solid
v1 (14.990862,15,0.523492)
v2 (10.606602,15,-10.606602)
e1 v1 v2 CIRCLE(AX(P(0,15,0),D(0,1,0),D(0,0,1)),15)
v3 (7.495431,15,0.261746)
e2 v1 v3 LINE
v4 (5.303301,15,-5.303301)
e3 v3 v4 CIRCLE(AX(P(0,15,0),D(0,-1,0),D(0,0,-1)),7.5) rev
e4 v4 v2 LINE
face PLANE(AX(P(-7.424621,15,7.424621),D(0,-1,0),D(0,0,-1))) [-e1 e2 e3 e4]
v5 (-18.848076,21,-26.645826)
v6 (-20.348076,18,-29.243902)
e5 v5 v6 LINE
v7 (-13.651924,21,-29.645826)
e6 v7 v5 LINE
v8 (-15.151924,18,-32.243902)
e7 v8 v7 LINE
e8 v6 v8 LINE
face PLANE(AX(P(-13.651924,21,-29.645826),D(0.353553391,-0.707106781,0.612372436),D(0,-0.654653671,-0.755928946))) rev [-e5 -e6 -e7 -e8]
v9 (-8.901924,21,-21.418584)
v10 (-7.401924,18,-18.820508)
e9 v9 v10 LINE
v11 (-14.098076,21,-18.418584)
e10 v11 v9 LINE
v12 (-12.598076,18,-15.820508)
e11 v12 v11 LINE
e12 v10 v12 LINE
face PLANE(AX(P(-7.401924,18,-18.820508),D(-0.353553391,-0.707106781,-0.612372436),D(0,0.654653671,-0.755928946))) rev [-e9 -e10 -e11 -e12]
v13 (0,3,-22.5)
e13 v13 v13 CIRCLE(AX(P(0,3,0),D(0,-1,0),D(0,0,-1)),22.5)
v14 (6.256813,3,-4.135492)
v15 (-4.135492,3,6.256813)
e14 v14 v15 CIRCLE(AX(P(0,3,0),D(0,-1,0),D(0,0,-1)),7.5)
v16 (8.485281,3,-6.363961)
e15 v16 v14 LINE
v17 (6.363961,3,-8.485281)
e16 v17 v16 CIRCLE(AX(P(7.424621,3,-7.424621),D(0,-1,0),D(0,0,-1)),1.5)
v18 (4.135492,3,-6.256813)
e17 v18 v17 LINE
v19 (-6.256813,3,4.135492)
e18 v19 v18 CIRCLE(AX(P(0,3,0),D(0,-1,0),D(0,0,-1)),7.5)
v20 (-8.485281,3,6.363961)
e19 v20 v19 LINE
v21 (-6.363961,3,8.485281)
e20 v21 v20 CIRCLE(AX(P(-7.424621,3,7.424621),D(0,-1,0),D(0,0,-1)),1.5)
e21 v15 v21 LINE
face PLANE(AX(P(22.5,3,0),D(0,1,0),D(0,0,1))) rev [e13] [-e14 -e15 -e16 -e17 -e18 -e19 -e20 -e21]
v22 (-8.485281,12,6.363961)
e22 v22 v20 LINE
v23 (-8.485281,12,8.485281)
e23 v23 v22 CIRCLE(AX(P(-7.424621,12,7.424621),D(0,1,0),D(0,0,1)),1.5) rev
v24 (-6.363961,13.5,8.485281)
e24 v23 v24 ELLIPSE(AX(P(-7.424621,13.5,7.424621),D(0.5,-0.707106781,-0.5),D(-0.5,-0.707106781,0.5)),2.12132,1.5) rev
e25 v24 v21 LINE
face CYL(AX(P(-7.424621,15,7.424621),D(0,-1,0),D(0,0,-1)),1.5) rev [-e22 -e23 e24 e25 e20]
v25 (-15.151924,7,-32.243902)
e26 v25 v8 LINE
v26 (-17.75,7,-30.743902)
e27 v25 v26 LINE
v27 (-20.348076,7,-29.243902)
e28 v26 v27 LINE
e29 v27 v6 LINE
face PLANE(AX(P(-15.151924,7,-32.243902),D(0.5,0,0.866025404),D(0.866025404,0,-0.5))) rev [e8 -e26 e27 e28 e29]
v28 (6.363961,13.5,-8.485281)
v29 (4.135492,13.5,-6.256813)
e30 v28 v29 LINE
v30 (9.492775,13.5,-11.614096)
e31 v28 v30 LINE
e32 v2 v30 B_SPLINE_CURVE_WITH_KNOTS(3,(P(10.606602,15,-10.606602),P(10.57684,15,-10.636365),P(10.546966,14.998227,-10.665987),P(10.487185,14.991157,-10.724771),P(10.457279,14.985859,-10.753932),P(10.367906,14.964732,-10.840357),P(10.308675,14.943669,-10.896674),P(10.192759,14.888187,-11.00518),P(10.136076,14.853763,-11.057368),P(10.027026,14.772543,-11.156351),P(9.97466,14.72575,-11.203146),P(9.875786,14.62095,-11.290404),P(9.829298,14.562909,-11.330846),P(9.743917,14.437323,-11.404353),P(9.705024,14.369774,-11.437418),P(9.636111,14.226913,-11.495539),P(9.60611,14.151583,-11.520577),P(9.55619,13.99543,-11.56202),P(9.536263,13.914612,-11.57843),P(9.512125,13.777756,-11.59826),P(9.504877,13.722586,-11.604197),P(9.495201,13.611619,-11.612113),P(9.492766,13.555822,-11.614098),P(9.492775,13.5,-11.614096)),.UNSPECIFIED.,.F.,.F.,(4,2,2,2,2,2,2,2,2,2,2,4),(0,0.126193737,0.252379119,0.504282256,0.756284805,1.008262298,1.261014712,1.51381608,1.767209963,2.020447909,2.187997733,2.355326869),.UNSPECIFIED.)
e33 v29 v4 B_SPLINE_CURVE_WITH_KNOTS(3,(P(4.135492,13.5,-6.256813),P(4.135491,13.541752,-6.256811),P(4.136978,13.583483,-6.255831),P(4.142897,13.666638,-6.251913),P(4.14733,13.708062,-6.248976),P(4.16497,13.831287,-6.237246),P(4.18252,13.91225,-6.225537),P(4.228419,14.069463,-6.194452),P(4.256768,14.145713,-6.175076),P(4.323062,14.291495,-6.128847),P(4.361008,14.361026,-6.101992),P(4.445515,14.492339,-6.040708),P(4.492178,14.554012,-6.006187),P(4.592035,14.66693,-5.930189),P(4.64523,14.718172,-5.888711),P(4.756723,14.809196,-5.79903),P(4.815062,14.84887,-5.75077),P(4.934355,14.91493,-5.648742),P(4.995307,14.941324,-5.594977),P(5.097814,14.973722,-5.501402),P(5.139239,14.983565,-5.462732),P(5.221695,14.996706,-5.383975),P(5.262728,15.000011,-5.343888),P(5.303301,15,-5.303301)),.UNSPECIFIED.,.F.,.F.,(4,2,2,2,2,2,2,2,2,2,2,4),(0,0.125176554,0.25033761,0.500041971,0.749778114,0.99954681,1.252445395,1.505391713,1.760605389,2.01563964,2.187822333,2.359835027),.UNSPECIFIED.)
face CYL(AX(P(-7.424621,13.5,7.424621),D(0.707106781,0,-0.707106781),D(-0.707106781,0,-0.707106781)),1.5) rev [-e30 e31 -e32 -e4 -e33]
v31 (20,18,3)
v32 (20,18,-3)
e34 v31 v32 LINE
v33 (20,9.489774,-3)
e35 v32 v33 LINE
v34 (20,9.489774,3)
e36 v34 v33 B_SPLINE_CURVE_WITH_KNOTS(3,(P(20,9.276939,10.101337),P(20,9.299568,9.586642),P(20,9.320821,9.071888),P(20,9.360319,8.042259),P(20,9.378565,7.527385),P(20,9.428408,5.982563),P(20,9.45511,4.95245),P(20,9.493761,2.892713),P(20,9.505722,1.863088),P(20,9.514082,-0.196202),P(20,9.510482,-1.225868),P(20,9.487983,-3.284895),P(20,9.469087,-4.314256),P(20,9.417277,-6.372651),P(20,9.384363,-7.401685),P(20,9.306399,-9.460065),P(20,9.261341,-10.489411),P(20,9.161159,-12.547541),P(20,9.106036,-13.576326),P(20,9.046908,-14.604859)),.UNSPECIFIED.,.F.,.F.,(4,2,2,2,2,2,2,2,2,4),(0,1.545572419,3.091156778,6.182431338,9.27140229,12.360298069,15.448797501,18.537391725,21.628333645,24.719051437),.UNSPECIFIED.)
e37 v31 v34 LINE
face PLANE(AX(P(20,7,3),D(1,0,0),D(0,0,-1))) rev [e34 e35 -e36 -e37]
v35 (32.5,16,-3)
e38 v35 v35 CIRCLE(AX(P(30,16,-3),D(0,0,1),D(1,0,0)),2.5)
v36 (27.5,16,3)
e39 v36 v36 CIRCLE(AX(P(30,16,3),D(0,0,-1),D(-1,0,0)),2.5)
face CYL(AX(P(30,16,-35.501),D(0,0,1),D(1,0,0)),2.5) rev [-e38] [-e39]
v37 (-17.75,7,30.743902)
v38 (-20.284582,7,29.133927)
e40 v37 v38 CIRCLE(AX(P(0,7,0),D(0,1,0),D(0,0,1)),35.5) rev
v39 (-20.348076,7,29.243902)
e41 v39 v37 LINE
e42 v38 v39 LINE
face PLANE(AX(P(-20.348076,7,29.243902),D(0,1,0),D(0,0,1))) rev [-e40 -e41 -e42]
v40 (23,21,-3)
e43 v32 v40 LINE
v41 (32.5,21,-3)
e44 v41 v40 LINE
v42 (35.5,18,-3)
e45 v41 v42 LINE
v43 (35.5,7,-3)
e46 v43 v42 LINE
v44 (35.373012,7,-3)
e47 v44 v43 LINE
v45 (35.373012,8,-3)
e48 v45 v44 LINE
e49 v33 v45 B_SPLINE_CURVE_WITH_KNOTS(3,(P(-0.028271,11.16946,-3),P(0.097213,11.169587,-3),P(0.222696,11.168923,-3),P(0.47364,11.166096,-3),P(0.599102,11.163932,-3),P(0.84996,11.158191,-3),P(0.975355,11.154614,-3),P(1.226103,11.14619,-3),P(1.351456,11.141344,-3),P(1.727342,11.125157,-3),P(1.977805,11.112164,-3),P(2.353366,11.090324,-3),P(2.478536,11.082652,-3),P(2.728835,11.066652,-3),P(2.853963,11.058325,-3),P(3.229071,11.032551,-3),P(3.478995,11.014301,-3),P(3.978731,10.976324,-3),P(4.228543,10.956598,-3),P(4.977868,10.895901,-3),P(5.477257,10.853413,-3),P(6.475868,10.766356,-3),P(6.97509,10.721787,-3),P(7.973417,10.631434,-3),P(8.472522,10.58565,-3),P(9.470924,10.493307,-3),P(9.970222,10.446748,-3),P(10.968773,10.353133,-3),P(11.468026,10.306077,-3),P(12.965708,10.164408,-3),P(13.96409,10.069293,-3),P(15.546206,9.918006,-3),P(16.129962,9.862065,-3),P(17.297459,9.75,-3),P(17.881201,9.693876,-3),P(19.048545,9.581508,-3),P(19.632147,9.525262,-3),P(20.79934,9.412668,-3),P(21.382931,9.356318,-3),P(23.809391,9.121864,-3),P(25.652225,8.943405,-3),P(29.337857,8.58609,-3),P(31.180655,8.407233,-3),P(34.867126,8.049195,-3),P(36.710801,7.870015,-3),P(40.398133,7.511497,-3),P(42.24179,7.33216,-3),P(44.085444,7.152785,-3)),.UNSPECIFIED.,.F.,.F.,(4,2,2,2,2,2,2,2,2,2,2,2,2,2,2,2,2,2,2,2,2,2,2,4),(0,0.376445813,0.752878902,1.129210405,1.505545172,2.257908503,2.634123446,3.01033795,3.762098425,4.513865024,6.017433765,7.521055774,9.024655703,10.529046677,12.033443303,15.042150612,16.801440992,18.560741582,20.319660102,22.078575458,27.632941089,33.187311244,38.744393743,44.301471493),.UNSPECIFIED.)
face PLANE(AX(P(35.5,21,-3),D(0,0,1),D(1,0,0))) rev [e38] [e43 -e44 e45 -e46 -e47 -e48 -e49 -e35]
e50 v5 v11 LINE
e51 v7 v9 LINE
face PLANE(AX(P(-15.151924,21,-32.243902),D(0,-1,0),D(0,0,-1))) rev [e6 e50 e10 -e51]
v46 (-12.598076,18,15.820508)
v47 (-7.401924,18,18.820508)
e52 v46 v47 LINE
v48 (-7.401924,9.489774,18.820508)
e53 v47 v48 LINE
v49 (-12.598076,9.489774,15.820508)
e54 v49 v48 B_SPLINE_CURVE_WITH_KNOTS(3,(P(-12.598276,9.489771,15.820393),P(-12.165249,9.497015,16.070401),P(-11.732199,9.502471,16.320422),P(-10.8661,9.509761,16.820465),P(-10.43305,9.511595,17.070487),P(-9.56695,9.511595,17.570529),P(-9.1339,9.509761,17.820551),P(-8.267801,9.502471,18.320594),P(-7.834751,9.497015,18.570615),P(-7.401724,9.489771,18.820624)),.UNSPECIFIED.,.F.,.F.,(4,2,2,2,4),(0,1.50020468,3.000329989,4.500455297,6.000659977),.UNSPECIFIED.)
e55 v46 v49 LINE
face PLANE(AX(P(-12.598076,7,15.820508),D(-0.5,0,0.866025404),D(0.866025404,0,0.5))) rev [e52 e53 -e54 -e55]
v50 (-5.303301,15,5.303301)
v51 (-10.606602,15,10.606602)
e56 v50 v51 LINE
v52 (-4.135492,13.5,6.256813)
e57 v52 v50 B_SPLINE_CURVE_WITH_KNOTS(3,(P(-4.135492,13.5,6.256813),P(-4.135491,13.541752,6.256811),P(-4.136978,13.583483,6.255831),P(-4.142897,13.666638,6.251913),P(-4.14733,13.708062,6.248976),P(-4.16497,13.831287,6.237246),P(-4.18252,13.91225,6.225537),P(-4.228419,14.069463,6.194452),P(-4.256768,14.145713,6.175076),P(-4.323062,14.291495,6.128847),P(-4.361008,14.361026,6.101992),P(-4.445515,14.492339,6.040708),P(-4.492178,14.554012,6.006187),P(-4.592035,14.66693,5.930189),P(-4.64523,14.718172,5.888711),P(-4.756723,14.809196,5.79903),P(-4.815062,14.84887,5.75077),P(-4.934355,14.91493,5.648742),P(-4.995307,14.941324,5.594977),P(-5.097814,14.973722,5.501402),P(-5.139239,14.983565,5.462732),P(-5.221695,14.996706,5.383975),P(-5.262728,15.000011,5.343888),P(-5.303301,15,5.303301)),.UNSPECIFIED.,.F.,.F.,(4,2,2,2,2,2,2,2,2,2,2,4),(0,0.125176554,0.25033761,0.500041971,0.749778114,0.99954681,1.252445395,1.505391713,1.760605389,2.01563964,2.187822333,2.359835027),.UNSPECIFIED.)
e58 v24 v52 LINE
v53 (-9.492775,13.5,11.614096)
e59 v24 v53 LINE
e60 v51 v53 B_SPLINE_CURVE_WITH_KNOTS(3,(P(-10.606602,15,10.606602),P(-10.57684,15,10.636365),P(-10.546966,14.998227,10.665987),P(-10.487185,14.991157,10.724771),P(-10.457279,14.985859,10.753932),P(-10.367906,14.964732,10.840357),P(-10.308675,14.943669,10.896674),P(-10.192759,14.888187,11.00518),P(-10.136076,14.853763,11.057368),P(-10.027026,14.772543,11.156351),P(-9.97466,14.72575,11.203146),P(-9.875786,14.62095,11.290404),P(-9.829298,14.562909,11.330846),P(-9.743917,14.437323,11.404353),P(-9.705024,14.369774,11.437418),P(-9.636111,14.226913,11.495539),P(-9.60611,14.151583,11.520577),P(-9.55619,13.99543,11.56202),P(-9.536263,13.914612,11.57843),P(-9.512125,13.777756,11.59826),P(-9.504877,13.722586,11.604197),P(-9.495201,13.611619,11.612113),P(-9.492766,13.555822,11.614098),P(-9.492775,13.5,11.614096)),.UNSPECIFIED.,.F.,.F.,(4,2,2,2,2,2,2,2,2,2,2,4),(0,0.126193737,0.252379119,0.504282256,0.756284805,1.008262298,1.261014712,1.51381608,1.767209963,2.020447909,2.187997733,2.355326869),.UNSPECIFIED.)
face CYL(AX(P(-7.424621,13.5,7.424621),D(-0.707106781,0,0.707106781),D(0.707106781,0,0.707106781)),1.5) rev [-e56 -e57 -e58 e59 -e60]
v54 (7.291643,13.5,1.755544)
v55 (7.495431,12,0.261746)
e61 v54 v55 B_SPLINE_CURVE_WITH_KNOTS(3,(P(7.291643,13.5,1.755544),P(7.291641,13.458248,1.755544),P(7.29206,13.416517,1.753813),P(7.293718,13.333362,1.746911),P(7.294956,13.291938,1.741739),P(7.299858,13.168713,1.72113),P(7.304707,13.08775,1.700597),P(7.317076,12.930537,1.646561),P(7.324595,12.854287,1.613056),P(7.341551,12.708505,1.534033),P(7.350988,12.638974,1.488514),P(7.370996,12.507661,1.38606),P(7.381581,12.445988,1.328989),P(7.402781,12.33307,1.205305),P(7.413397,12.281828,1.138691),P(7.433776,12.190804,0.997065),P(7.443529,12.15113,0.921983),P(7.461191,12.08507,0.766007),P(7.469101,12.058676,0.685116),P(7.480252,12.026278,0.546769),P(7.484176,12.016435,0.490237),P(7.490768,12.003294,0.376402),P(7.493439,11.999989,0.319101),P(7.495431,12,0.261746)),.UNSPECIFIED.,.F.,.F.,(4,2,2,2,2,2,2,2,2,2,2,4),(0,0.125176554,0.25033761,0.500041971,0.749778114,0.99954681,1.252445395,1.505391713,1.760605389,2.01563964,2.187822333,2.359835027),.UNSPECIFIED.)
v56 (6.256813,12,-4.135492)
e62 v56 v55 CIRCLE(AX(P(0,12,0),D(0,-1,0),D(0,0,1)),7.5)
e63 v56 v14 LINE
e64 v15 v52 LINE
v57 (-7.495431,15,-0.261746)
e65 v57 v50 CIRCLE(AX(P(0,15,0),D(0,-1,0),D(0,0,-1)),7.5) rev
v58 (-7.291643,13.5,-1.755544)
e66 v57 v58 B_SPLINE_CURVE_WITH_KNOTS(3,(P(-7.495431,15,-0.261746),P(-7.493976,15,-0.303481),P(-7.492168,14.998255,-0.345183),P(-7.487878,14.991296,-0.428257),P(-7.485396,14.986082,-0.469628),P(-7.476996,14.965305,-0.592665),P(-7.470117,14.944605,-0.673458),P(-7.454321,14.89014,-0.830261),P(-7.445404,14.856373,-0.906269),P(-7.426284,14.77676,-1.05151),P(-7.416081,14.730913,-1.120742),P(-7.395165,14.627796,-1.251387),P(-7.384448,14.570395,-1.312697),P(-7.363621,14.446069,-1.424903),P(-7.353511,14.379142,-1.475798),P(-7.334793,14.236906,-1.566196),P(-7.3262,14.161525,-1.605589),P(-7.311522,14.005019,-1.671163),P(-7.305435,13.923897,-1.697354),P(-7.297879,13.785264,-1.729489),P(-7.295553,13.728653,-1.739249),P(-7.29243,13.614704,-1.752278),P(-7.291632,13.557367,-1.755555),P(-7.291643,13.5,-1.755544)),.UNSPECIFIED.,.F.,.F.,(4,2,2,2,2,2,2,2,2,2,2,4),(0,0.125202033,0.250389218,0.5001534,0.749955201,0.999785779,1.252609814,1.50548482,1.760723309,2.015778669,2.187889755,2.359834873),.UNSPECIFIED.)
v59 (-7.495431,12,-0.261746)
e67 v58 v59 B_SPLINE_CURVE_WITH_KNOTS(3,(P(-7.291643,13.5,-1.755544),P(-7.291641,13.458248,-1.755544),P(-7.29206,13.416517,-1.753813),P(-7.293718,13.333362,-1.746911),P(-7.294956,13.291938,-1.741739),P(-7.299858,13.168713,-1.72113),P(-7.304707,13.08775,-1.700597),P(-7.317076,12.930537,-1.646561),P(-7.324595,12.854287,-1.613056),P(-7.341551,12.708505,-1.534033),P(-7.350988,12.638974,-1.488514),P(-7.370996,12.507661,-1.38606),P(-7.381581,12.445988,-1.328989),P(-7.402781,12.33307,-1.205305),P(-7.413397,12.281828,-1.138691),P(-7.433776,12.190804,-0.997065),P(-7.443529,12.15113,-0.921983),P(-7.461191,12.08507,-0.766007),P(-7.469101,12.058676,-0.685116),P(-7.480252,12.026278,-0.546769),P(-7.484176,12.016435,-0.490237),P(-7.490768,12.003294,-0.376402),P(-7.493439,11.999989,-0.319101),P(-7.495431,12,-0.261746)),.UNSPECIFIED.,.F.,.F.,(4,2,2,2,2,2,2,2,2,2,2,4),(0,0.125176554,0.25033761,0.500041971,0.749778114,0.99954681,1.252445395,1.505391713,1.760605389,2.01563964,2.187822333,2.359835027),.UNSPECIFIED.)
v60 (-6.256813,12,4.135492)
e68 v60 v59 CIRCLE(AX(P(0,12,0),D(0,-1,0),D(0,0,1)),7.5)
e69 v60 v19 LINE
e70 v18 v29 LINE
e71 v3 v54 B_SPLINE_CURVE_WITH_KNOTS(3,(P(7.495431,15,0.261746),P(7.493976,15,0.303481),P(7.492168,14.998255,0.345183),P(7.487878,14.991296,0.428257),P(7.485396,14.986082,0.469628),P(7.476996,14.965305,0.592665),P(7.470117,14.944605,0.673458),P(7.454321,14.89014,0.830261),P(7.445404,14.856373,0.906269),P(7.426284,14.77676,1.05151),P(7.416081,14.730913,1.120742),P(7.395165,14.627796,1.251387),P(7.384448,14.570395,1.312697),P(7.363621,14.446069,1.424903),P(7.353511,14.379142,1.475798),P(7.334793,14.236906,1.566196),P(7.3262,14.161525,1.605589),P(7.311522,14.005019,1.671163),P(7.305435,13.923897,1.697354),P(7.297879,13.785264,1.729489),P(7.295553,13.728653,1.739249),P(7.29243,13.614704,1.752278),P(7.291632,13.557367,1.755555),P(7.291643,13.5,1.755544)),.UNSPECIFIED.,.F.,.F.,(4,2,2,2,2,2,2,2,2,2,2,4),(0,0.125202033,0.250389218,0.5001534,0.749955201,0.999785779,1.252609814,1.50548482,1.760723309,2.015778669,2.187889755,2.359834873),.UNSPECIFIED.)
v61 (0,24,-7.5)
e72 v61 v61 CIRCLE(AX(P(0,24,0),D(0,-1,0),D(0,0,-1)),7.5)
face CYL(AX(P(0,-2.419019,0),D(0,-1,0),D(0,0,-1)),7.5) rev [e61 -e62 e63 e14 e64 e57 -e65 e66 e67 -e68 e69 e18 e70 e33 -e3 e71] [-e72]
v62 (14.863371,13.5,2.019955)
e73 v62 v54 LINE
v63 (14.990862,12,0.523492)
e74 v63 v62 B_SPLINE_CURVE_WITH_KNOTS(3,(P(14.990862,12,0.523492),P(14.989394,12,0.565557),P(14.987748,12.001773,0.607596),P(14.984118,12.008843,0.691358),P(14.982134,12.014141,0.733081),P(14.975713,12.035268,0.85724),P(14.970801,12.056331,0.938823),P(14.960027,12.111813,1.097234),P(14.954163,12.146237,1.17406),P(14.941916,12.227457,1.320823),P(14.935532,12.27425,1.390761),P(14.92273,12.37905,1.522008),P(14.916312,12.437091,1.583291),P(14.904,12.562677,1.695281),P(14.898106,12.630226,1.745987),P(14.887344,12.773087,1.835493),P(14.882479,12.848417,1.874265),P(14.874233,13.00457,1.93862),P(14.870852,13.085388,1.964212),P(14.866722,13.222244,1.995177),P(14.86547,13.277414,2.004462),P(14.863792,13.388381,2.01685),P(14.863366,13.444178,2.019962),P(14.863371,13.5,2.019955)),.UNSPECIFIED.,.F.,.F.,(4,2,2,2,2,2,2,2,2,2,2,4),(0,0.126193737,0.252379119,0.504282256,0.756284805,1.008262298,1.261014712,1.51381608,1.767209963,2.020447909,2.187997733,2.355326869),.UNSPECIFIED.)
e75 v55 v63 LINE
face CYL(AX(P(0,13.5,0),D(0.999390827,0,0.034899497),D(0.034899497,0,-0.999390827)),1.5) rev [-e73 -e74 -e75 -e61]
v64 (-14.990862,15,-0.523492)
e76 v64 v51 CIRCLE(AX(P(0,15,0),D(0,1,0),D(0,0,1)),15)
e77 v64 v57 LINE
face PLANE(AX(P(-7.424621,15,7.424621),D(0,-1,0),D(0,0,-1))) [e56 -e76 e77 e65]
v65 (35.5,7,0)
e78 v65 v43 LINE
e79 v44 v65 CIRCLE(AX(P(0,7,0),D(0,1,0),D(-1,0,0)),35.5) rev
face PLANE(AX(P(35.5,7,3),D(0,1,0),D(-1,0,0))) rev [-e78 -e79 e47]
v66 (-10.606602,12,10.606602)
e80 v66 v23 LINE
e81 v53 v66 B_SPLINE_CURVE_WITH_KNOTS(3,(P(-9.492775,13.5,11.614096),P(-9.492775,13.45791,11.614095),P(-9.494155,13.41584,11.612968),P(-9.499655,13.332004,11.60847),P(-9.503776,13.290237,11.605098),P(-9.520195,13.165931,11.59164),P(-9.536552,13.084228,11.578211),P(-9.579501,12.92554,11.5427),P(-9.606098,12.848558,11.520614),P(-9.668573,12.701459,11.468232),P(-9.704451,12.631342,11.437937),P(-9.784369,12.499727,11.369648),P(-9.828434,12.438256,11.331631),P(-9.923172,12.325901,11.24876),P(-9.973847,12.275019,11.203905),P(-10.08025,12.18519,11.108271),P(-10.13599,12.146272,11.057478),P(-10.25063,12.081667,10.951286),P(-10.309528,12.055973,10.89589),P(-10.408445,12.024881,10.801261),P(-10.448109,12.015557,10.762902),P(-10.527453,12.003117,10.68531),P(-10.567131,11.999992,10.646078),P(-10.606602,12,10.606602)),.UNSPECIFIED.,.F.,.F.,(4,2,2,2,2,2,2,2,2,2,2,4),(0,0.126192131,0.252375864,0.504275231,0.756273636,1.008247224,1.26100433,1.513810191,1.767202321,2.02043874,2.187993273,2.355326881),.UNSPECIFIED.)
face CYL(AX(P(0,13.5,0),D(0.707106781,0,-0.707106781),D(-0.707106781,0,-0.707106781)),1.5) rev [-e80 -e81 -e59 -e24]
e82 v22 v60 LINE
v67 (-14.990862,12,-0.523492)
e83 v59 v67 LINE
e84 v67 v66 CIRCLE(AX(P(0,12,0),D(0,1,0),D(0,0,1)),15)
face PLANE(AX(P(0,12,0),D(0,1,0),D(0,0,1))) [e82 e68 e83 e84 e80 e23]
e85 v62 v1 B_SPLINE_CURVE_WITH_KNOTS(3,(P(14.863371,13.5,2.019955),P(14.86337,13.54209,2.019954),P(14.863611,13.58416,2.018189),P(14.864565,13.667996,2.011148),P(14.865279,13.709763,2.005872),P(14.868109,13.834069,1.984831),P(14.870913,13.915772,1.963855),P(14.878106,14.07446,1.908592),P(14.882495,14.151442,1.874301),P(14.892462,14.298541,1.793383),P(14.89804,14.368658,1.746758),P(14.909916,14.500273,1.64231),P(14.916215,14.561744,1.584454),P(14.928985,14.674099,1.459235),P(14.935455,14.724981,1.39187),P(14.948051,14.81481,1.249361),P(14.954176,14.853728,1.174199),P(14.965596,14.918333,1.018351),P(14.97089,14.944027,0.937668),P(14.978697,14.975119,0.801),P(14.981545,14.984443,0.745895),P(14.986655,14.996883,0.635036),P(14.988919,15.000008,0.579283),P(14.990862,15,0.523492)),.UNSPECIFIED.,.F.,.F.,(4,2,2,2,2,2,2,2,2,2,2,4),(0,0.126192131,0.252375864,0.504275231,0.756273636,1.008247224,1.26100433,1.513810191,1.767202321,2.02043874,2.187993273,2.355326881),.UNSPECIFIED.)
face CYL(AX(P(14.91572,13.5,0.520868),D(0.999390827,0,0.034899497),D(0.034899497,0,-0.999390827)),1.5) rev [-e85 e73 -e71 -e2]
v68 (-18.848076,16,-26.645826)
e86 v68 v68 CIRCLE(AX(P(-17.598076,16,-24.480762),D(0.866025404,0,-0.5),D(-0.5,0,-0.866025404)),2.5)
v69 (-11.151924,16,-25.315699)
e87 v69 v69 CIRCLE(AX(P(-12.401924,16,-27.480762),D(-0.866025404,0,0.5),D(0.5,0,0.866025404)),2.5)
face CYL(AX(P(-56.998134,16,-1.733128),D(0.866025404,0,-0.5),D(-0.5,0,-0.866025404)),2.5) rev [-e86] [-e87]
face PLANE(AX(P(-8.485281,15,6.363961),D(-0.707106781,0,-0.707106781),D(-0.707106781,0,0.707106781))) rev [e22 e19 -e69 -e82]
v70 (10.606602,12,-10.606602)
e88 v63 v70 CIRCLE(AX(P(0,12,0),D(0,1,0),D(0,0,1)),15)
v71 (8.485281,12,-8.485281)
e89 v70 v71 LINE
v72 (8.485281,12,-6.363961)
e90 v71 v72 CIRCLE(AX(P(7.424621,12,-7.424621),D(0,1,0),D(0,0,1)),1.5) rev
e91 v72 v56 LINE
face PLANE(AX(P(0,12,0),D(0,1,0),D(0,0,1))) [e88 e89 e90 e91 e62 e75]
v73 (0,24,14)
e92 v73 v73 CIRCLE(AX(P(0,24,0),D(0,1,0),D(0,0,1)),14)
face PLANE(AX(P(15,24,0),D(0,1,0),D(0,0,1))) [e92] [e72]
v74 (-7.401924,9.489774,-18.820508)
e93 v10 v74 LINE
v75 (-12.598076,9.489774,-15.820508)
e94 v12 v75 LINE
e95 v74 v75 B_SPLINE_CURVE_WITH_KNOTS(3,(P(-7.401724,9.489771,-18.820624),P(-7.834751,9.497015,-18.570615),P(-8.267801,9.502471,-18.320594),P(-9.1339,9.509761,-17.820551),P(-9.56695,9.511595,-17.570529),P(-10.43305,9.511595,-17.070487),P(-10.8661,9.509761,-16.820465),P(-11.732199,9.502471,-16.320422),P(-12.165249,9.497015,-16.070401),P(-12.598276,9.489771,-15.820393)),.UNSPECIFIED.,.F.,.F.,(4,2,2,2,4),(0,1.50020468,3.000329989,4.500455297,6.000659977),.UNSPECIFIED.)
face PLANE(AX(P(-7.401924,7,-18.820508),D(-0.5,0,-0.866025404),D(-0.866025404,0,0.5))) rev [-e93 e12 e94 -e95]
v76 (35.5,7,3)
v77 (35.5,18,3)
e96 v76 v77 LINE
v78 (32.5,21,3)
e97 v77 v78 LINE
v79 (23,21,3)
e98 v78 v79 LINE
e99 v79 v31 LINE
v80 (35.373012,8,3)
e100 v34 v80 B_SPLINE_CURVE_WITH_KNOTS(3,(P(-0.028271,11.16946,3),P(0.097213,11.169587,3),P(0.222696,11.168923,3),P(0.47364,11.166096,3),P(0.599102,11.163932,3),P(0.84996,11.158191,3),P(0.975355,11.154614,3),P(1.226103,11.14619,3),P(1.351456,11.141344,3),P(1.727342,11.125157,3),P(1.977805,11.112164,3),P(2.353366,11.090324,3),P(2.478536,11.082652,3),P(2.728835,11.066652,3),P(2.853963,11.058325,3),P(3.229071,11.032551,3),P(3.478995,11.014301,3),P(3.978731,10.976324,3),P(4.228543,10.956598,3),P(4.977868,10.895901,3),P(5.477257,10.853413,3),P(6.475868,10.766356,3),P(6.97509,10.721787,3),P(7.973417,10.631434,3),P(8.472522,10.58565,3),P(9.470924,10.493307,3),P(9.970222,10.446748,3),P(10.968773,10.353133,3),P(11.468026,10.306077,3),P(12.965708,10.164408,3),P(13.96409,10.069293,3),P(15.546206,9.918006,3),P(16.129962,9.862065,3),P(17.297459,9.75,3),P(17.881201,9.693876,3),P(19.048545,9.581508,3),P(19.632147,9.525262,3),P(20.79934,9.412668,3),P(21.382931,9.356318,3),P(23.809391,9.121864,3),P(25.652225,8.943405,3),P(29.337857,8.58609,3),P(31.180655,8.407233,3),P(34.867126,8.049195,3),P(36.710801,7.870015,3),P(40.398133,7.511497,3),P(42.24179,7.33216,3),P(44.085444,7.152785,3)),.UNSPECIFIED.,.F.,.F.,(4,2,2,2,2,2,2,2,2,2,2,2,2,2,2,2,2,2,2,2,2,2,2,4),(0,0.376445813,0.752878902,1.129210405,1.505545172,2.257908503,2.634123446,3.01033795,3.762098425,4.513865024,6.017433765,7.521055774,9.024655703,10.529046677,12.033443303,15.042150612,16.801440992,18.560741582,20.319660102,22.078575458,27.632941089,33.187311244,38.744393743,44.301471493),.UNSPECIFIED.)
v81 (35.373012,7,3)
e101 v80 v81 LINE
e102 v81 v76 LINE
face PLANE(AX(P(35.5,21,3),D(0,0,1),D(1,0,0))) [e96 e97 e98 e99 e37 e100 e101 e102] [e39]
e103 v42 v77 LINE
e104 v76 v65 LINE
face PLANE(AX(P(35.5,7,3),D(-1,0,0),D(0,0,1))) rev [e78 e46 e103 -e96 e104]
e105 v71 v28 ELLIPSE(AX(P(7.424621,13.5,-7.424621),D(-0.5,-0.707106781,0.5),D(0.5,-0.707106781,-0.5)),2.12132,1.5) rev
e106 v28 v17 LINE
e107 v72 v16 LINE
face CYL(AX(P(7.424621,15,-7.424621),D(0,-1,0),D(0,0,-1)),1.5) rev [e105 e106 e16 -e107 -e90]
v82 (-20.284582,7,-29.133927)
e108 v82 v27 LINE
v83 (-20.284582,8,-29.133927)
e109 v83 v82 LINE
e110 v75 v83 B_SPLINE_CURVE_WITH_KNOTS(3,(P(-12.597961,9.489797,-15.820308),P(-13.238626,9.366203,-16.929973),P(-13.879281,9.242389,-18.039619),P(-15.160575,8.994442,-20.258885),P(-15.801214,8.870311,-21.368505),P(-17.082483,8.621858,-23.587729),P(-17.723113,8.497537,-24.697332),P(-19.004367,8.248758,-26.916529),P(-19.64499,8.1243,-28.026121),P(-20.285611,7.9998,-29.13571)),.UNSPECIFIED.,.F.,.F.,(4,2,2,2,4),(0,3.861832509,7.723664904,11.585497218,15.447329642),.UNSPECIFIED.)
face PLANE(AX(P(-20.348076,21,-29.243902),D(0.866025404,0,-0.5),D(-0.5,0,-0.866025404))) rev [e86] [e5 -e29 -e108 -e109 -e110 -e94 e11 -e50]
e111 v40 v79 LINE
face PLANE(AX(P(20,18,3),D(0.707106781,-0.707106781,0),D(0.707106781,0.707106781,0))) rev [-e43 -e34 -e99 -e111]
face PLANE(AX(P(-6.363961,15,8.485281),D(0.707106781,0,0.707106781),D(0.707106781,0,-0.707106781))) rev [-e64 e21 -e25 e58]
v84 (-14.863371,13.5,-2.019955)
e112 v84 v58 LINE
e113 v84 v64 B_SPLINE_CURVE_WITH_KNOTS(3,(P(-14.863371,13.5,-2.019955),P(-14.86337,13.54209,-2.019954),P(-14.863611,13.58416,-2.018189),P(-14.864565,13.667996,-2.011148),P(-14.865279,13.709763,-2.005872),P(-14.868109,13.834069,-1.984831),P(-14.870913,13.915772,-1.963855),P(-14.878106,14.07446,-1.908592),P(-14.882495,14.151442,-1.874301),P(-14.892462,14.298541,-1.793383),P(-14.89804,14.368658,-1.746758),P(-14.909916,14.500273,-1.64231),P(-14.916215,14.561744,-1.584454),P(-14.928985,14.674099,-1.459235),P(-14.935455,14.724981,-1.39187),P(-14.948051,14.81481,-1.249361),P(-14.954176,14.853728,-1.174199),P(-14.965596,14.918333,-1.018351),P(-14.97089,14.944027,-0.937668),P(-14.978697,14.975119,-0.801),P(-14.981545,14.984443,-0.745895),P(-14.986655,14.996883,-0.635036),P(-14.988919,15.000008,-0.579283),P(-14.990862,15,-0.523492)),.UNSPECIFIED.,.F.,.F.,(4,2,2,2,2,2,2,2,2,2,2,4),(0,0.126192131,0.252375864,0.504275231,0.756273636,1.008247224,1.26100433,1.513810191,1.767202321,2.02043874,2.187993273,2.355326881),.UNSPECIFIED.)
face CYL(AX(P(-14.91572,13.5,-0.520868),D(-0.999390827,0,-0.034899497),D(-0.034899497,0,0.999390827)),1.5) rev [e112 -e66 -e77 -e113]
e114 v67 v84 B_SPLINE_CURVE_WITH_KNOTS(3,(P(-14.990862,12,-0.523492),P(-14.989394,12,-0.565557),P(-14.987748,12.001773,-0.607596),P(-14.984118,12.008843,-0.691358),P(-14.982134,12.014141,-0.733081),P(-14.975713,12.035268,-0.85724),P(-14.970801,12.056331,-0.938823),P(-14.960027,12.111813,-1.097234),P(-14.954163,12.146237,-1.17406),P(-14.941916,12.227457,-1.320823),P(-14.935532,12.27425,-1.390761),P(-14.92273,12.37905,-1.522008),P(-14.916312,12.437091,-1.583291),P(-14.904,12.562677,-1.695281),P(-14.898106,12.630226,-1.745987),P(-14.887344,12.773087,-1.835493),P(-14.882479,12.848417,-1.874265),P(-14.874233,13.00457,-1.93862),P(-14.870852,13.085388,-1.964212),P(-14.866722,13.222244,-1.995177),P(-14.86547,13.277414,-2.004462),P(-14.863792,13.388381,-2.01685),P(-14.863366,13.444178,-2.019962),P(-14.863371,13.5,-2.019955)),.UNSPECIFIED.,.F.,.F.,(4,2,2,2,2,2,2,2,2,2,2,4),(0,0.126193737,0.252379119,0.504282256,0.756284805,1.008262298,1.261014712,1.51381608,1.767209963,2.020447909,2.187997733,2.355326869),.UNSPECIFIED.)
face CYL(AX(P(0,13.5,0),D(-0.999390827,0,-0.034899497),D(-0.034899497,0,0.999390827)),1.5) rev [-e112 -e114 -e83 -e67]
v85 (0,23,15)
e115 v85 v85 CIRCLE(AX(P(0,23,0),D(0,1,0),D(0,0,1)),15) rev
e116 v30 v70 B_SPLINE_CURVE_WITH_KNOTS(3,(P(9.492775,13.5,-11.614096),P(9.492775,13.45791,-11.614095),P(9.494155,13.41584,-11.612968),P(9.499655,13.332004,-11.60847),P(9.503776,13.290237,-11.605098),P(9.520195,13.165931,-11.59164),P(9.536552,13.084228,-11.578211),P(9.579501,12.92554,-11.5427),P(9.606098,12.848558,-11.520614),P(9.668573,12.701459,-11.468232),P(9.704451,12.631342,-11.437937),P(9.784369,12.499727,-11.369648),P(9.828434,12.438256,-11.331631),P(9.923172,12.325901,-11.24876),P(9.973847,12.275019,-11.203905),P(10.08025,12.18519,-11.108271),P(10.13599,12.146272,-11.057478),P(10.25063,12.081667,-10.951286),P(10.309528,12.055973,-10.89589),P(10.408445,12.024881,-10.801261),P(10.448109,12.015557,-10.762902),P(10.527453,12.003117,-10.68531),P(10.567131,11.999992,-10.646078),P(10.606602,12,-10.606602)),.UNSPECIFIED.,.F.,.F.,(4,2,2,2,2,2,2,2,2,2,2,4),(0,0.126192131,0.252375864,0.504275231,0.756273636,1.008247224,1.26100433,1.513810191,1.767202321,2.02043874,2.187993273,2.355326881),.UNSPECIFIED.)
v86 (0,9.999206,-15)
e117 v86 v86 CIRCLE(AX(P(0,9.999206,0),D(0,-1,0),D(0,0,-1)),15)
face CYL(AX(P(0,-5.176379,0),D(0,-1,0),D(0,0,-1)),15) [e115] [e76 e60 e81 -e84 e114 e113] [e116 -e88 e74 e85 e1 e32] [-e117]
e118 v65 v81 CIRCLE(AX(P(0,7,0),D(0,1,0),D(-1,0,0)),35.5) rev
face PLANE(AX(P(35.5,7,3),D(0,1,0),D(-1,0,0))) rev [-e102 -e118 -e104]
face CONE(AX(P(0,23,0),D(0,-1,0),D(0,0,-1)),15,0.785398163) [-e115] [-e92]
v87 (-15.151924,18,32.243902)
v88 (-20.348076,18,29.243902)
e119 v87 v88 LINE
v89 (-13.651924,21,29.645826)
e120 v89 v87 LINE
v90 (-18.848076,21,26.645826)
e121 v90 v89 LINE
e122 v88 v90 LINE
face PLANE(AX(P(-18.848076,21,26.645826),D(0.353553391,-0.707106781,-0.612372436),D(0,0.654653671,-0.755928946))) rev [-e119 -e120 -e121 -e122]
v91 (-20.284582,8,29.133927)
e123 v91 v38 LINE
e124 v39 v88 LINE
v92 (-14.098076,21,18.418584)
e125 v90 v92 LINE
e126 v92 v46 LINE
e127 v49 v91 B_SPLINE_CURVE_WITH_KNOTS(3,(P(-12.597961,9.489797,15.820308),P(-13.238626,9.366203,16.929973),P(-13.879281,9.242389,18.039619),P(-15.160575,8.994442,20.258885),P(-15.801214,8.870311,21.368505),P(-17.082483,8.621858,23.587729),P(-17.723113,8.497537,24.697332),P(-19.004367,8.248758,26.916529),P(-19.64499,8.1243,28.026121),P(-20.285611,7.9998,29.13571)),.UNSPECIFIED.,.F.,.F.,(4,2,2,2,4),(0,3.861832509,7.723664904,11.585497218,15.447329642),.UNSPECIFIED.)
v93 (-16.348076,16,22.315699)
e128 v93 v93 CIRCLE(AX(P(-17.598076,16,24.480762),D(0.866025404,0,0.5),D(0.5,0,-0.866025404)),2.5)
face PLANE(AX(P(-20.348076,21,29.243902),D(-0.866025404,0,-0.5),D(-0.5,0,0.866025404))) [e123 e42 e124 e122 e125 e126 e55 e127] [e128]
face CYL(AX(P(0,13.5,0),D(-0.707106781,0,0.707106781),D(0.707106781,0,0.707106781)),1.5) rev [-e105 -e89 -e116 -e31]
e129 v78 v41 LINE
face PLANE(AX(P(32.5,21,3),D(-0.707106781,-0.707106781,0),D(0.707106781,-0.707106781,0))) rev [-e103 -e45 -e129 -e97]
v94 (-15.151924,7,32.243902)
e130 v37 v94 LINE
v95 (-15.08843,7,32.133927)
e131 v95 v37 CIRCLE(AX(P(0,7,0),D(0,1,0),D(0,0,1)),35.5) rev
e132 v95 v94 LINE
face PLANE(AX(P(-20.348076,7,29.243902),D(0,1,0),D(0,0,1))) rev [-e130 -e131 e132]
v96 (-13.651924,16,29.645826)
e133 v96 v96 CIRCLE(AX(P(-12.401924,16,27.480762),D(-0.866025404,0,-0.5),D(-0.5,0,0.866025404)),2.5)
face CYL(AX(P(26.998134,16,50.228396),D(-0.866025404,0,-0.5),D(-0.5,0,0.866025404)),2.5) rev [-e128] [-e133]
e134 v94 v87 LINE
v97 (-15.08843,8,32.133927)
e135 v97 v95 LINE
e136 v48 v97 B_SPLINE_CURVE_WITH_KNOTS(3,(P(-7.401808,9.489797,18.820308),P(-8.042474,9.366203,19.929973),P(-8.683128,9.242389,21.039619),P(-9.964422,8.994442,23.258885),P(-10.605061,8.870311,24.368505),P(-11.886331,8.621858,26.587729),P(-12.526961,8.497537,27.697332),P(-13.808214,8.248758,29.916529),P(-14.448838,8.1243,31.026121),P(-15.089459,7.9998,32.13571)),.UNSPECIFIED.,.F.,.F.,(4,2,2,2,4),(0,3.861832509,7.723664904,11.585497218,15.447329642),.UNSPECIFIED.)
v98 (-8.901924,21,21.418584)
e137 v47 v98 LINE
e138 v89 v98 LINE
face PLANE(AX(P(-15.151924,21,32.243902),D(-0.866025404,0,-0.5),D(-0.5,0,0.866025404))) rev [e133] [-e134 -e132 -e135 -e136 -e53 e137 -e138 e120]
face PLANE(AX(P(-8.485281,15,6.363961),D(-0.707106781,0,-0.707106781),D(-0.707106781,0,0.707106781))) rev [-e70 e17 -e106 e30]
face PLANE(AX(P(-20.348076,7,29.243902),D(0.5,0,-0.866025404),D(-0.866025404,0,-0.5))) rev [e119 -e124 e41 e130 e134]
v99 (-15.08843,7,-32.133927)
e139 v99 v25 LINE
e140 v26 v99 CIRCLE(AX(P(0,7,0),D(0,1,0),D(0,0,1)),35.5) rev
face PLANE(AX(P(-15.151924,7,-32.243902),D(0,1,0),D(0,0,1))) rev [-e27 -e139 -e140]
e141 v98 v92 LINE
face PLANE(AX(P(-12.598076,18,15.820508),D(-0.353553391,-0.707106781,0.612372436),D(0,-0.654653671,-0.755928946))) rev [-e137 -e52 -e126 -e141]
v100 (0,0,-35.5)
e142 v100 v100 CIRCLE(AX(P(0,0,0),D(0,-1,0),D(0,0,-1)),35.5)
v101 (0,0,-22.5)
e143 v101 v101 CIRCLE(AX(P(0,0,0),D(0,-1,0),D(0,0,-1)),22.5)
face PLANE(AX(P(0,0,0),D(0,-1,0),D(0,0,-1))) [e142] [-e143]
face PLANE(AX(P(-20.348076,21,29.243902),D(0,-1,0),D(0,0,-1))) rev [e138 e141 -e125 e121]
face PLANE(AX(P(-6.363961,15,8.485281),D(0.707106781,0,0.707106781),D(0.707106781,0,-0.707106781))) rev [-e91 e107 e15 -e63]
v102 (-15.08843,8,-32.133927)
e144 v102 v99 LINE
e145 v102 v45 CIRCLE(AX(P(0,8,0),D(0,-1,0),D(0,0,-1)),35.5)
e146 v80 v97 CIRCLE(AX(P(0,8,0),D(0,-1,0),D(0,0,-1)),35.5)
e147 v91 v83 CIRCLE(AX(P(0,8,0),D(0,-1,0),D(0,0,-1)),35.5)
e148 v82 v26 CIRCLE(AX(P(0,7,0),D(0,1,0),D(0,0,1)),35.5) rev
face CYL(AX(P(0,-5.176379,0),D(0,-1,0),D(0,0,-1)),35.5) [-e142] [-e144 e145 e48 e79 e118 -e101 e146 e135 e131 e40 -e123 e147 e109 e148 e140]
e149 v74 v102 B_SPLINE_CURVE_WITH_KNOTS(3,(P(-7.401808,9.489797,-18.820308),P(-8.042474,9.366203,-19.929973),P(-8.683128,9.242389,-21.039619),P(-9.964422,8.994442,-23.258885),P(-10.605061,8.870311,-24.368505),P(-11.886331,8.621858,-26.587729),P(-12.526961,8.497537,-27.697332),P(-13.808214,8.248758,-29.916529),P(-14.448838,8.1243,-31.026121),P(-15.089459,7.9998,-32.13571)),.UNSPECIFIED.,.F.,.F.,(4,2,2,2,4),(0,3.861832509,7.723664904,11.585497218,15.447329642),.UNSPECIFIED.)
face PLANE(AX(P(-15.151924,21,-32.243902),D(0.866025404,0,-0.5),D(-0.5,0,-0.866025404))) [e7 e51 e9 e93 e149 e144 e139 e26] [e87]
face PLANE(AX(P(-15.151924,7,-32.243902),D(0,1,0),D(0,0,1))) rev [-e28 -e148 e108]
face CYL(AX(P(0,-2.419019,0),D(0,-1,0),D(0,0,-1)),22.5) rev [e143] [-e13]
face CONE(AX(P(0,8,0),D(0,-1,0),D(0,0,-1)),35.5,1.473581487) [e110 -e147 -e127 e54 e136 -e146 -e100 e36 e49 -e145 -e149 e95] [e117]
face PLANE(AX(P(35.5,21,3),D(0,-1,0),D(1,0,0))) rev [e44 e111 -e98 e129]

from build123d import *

# Parameters (mm, degrees)
SKETCH2_W           = 15.5
SKETCH2_H           = 14
BOSS_EXTRUDE1_DEPTH = 3
CIRPATTERN1_COUNT   = 3
CUT_EXTRUDE1_DEPTH  = 12
CUT_EXTRUDE2_START  = -9
CUT_EXTRUDE2_DEPTH  = 3
CUT_EXTRUDE3_REACH  = 60.279
SKETCH6_R           = 2.5
CIRPATTERN2_COUNT   = 3
FILLET1_R           = 1.5
CHAMFER1_SIZE       = 3
CHAMFER2_SIZE       = 1


with BuildPart() as part:
    # Sketch1 → Revolve1 (revolve)
    with BuildSketch(Plane.XY, mode=Mode.PRIVATE) as revolve1_sk:
        Polygon((0, 0), (35.5, 0), (35.5, 8), (15, 9.999206161), (15, 24), (0, 24), align=None)
    revolve(revolve1_sk.sketch.rotate(Axis((0, -5.176379432, 0), (0, 1, 0)), 90), axis=Axis((0, -5.176379432, 0), (0, 1, 0)))

    # Sketch2 → Boss-Extrude1 (add, symmetric)
    with BuildSketch(Plane.XY):
        with Locations((27.75, 14)):
            Rectangle(SKETCH2_W, SKETCH2_H)
    boss_extrude1 = extrude(amount=BOSS_EXTRUDE1_DEPTH, both=True)

    # CirPattern1: Boss-Extrude1 ×3 about axis
    cirpattern1_axis = Axis((0, 0, 0), (0, 1, 0))
    for i in range(1, CIRPATTERN1_COUNT):
        add(boss_extrude1.rotate(cirpattern1_axis, i * 360 / CIRPATTERN1_COUNT))

    # Sketch3 → Cut-Revolve1 (revolve, cut)
    with BuildSketch(Plane.XY, mode=Mode.PRIVATE) as cut_revolve1_sk:
        Polygon((0, 0), (22.5, 0), (22.5, 3), (7.5, 3), (7.5, 24), (0, 24), align=None)
    revolve(cut_revolve1_sk.sketch.rotate(Axis((0, -2.419018625, 0), (0, 1, 0)), 90), axis=Axis((0, -2.419018625, 0), (0, 1, 0)), mode=Mode.SUBTRACT)

    # Sketch4 → Cut-Extrude1 (cut)
    with BuildSketch(Plane.XZ.offset(-3)):
        with BuildLine():
            Line((-6.363961031, 8.485281374), (8.485281374, -6.363961031))
            ThreePointArc((8.485281374, -6.363961031), (8.485281374, -8.485281374), (6.363961031, -8.485281374))
            Line((6.363961031, -8.485281374), (-8.485281374, 6.363961031))
            ThreePointArc((-8.485281374, 6.363961031), (-8.485281374, 8.485281374), (-6.363961031, 8.485281374))
        make_face()
    extrude(amount=-CUT_EXTRUDE1_DEPTH, mode=Mode.SUBTRACT)

    # Sketch5 → Cut-Extrude2 (cut)
    with BuildSketch(Plane(origin=(0, 24, 0), x_dir=(1, 0, 0), z_dir=(0, 1, 0)).offset(CUT_EXTRUDE2_START)):
        with BuildLine():
            Line((9.492775288, 11.614095631), (4.135492251, 6.256812594))
            ThreePointArc((4.135492251, 6.256812594), (6.97813176, 2.7487592), (7.291643494, -1.755544118))
            Line((7.291643494, -1.755544118), (14.86337052, -2.019954652))
            ThreePointArc((14.86337052, -2.019954652), (13.95626352, 5.497518401), (9.492775288, 11.614095631))
        make_face()
        with BuildLine():
            Line((-4.135492251, -6.256812594), (-9.492775288, -11.614095631))
            ThreePointArc((-9.492775288, -11.614095631), (-13.95626352, -5.497518401), (-14.86337052, 2.019954652))
            Line((-14.86337052, 2.019954652), (-7.291643494, 1.755544118))
            ThreePointArc((-7.291643494, 1.755544118), (-6.97813176, -2.7487592), (-4.135492251, -6.256812594))
        make_face()
    extrude(amount=-CUT_EXTRUDE2_DEPTH, mode=Mode.SUBTRACT)

    # Sketch6 → Cut-Extrude3 (cut, up to next)
    with BuildSketch(Plane(origin=(-2.598076211, 0, -1.5), x_dir=(0.500000000000004, 0, -0.8660254037844364), z_dir=(0.8660254037844365, 0, 0.500000000000004)), mode=Mode.PRIVATE) as cut_extrude3_sk1:
        with Locations(Location((-30, 16, 0), (0, 0, 180))):
            Circle(SKETCH6_R)
    cut_extrude3_tool1 = extrude(cut_extrude3_sk1.sketch, amount=CUT_EXTRUDE3_REACH, mode=Mode.PRIVATE) & part.part
    cut_extrude3 = cut_extrude3_tool1.solids().sort_by_distance((-17.598076, 16, 24.480762))[0]
    add(cut_extrude3, mode=Mode.SUBTRACT)

    # CirPattern2: Cut-Extrude3 ×3 about axis
    cirpattern2_axis = Axis((0, -5.176379432, 0), (0, -1, 0))
    for i in range(1, CIRPATTERN2_COUNT):
        add(cut_extrude3.rotate(cirpattern2_axis, i * 360 / CIRPATTERN2_COUNT), mode=Mode.SUBTRACT)

    # Fillet1
    fillet1_edges = [part.edges().sort_by_distance(p)[0] for p in [
        (11.077507007, 15, 1.887749385),
        (11.077507007, 12, 1.887749385),
        (6.814133769, 15, -8.935454113),
        (7.928368159, 12, -10.049688503),
        (-6.814133769, 15, 8.935454113),
        (-7.928368159, 12, 10.049688503),
        (-11.077507007, 15, -1.887749385),
        (-11.077507007, 12, -1.887749385),
    ]]
    fillet(fillet1_edges, radius=FILLET1_R - 0.0001)  # a hair under: the kernel refuses the full size

    # Chamfer1
    chamfer1_edges = [part.edges().sort_by_distance(p)[0] for p in [
        (35.5, 21, 0),
        (20, 21, 0),
        (-17.75, 21, 30.743901834),
        (-10, 21, 17.320508076),
        (-17.75, 21, -30.743901834),
        (-10, 21, -17.320508076),
    ]]
    chamfer(chamfer1_edges, length=CHAMFER1_SIZE)

    # Chamfer2
    chamfer2_edges = [part.edges().sort_by_distance(p)[0] for p in [
        (0, 24, 15),
    ]]
    chamfer(chamfer2_edges, length=CHAMFER2_SIZE)


solid = part.part
